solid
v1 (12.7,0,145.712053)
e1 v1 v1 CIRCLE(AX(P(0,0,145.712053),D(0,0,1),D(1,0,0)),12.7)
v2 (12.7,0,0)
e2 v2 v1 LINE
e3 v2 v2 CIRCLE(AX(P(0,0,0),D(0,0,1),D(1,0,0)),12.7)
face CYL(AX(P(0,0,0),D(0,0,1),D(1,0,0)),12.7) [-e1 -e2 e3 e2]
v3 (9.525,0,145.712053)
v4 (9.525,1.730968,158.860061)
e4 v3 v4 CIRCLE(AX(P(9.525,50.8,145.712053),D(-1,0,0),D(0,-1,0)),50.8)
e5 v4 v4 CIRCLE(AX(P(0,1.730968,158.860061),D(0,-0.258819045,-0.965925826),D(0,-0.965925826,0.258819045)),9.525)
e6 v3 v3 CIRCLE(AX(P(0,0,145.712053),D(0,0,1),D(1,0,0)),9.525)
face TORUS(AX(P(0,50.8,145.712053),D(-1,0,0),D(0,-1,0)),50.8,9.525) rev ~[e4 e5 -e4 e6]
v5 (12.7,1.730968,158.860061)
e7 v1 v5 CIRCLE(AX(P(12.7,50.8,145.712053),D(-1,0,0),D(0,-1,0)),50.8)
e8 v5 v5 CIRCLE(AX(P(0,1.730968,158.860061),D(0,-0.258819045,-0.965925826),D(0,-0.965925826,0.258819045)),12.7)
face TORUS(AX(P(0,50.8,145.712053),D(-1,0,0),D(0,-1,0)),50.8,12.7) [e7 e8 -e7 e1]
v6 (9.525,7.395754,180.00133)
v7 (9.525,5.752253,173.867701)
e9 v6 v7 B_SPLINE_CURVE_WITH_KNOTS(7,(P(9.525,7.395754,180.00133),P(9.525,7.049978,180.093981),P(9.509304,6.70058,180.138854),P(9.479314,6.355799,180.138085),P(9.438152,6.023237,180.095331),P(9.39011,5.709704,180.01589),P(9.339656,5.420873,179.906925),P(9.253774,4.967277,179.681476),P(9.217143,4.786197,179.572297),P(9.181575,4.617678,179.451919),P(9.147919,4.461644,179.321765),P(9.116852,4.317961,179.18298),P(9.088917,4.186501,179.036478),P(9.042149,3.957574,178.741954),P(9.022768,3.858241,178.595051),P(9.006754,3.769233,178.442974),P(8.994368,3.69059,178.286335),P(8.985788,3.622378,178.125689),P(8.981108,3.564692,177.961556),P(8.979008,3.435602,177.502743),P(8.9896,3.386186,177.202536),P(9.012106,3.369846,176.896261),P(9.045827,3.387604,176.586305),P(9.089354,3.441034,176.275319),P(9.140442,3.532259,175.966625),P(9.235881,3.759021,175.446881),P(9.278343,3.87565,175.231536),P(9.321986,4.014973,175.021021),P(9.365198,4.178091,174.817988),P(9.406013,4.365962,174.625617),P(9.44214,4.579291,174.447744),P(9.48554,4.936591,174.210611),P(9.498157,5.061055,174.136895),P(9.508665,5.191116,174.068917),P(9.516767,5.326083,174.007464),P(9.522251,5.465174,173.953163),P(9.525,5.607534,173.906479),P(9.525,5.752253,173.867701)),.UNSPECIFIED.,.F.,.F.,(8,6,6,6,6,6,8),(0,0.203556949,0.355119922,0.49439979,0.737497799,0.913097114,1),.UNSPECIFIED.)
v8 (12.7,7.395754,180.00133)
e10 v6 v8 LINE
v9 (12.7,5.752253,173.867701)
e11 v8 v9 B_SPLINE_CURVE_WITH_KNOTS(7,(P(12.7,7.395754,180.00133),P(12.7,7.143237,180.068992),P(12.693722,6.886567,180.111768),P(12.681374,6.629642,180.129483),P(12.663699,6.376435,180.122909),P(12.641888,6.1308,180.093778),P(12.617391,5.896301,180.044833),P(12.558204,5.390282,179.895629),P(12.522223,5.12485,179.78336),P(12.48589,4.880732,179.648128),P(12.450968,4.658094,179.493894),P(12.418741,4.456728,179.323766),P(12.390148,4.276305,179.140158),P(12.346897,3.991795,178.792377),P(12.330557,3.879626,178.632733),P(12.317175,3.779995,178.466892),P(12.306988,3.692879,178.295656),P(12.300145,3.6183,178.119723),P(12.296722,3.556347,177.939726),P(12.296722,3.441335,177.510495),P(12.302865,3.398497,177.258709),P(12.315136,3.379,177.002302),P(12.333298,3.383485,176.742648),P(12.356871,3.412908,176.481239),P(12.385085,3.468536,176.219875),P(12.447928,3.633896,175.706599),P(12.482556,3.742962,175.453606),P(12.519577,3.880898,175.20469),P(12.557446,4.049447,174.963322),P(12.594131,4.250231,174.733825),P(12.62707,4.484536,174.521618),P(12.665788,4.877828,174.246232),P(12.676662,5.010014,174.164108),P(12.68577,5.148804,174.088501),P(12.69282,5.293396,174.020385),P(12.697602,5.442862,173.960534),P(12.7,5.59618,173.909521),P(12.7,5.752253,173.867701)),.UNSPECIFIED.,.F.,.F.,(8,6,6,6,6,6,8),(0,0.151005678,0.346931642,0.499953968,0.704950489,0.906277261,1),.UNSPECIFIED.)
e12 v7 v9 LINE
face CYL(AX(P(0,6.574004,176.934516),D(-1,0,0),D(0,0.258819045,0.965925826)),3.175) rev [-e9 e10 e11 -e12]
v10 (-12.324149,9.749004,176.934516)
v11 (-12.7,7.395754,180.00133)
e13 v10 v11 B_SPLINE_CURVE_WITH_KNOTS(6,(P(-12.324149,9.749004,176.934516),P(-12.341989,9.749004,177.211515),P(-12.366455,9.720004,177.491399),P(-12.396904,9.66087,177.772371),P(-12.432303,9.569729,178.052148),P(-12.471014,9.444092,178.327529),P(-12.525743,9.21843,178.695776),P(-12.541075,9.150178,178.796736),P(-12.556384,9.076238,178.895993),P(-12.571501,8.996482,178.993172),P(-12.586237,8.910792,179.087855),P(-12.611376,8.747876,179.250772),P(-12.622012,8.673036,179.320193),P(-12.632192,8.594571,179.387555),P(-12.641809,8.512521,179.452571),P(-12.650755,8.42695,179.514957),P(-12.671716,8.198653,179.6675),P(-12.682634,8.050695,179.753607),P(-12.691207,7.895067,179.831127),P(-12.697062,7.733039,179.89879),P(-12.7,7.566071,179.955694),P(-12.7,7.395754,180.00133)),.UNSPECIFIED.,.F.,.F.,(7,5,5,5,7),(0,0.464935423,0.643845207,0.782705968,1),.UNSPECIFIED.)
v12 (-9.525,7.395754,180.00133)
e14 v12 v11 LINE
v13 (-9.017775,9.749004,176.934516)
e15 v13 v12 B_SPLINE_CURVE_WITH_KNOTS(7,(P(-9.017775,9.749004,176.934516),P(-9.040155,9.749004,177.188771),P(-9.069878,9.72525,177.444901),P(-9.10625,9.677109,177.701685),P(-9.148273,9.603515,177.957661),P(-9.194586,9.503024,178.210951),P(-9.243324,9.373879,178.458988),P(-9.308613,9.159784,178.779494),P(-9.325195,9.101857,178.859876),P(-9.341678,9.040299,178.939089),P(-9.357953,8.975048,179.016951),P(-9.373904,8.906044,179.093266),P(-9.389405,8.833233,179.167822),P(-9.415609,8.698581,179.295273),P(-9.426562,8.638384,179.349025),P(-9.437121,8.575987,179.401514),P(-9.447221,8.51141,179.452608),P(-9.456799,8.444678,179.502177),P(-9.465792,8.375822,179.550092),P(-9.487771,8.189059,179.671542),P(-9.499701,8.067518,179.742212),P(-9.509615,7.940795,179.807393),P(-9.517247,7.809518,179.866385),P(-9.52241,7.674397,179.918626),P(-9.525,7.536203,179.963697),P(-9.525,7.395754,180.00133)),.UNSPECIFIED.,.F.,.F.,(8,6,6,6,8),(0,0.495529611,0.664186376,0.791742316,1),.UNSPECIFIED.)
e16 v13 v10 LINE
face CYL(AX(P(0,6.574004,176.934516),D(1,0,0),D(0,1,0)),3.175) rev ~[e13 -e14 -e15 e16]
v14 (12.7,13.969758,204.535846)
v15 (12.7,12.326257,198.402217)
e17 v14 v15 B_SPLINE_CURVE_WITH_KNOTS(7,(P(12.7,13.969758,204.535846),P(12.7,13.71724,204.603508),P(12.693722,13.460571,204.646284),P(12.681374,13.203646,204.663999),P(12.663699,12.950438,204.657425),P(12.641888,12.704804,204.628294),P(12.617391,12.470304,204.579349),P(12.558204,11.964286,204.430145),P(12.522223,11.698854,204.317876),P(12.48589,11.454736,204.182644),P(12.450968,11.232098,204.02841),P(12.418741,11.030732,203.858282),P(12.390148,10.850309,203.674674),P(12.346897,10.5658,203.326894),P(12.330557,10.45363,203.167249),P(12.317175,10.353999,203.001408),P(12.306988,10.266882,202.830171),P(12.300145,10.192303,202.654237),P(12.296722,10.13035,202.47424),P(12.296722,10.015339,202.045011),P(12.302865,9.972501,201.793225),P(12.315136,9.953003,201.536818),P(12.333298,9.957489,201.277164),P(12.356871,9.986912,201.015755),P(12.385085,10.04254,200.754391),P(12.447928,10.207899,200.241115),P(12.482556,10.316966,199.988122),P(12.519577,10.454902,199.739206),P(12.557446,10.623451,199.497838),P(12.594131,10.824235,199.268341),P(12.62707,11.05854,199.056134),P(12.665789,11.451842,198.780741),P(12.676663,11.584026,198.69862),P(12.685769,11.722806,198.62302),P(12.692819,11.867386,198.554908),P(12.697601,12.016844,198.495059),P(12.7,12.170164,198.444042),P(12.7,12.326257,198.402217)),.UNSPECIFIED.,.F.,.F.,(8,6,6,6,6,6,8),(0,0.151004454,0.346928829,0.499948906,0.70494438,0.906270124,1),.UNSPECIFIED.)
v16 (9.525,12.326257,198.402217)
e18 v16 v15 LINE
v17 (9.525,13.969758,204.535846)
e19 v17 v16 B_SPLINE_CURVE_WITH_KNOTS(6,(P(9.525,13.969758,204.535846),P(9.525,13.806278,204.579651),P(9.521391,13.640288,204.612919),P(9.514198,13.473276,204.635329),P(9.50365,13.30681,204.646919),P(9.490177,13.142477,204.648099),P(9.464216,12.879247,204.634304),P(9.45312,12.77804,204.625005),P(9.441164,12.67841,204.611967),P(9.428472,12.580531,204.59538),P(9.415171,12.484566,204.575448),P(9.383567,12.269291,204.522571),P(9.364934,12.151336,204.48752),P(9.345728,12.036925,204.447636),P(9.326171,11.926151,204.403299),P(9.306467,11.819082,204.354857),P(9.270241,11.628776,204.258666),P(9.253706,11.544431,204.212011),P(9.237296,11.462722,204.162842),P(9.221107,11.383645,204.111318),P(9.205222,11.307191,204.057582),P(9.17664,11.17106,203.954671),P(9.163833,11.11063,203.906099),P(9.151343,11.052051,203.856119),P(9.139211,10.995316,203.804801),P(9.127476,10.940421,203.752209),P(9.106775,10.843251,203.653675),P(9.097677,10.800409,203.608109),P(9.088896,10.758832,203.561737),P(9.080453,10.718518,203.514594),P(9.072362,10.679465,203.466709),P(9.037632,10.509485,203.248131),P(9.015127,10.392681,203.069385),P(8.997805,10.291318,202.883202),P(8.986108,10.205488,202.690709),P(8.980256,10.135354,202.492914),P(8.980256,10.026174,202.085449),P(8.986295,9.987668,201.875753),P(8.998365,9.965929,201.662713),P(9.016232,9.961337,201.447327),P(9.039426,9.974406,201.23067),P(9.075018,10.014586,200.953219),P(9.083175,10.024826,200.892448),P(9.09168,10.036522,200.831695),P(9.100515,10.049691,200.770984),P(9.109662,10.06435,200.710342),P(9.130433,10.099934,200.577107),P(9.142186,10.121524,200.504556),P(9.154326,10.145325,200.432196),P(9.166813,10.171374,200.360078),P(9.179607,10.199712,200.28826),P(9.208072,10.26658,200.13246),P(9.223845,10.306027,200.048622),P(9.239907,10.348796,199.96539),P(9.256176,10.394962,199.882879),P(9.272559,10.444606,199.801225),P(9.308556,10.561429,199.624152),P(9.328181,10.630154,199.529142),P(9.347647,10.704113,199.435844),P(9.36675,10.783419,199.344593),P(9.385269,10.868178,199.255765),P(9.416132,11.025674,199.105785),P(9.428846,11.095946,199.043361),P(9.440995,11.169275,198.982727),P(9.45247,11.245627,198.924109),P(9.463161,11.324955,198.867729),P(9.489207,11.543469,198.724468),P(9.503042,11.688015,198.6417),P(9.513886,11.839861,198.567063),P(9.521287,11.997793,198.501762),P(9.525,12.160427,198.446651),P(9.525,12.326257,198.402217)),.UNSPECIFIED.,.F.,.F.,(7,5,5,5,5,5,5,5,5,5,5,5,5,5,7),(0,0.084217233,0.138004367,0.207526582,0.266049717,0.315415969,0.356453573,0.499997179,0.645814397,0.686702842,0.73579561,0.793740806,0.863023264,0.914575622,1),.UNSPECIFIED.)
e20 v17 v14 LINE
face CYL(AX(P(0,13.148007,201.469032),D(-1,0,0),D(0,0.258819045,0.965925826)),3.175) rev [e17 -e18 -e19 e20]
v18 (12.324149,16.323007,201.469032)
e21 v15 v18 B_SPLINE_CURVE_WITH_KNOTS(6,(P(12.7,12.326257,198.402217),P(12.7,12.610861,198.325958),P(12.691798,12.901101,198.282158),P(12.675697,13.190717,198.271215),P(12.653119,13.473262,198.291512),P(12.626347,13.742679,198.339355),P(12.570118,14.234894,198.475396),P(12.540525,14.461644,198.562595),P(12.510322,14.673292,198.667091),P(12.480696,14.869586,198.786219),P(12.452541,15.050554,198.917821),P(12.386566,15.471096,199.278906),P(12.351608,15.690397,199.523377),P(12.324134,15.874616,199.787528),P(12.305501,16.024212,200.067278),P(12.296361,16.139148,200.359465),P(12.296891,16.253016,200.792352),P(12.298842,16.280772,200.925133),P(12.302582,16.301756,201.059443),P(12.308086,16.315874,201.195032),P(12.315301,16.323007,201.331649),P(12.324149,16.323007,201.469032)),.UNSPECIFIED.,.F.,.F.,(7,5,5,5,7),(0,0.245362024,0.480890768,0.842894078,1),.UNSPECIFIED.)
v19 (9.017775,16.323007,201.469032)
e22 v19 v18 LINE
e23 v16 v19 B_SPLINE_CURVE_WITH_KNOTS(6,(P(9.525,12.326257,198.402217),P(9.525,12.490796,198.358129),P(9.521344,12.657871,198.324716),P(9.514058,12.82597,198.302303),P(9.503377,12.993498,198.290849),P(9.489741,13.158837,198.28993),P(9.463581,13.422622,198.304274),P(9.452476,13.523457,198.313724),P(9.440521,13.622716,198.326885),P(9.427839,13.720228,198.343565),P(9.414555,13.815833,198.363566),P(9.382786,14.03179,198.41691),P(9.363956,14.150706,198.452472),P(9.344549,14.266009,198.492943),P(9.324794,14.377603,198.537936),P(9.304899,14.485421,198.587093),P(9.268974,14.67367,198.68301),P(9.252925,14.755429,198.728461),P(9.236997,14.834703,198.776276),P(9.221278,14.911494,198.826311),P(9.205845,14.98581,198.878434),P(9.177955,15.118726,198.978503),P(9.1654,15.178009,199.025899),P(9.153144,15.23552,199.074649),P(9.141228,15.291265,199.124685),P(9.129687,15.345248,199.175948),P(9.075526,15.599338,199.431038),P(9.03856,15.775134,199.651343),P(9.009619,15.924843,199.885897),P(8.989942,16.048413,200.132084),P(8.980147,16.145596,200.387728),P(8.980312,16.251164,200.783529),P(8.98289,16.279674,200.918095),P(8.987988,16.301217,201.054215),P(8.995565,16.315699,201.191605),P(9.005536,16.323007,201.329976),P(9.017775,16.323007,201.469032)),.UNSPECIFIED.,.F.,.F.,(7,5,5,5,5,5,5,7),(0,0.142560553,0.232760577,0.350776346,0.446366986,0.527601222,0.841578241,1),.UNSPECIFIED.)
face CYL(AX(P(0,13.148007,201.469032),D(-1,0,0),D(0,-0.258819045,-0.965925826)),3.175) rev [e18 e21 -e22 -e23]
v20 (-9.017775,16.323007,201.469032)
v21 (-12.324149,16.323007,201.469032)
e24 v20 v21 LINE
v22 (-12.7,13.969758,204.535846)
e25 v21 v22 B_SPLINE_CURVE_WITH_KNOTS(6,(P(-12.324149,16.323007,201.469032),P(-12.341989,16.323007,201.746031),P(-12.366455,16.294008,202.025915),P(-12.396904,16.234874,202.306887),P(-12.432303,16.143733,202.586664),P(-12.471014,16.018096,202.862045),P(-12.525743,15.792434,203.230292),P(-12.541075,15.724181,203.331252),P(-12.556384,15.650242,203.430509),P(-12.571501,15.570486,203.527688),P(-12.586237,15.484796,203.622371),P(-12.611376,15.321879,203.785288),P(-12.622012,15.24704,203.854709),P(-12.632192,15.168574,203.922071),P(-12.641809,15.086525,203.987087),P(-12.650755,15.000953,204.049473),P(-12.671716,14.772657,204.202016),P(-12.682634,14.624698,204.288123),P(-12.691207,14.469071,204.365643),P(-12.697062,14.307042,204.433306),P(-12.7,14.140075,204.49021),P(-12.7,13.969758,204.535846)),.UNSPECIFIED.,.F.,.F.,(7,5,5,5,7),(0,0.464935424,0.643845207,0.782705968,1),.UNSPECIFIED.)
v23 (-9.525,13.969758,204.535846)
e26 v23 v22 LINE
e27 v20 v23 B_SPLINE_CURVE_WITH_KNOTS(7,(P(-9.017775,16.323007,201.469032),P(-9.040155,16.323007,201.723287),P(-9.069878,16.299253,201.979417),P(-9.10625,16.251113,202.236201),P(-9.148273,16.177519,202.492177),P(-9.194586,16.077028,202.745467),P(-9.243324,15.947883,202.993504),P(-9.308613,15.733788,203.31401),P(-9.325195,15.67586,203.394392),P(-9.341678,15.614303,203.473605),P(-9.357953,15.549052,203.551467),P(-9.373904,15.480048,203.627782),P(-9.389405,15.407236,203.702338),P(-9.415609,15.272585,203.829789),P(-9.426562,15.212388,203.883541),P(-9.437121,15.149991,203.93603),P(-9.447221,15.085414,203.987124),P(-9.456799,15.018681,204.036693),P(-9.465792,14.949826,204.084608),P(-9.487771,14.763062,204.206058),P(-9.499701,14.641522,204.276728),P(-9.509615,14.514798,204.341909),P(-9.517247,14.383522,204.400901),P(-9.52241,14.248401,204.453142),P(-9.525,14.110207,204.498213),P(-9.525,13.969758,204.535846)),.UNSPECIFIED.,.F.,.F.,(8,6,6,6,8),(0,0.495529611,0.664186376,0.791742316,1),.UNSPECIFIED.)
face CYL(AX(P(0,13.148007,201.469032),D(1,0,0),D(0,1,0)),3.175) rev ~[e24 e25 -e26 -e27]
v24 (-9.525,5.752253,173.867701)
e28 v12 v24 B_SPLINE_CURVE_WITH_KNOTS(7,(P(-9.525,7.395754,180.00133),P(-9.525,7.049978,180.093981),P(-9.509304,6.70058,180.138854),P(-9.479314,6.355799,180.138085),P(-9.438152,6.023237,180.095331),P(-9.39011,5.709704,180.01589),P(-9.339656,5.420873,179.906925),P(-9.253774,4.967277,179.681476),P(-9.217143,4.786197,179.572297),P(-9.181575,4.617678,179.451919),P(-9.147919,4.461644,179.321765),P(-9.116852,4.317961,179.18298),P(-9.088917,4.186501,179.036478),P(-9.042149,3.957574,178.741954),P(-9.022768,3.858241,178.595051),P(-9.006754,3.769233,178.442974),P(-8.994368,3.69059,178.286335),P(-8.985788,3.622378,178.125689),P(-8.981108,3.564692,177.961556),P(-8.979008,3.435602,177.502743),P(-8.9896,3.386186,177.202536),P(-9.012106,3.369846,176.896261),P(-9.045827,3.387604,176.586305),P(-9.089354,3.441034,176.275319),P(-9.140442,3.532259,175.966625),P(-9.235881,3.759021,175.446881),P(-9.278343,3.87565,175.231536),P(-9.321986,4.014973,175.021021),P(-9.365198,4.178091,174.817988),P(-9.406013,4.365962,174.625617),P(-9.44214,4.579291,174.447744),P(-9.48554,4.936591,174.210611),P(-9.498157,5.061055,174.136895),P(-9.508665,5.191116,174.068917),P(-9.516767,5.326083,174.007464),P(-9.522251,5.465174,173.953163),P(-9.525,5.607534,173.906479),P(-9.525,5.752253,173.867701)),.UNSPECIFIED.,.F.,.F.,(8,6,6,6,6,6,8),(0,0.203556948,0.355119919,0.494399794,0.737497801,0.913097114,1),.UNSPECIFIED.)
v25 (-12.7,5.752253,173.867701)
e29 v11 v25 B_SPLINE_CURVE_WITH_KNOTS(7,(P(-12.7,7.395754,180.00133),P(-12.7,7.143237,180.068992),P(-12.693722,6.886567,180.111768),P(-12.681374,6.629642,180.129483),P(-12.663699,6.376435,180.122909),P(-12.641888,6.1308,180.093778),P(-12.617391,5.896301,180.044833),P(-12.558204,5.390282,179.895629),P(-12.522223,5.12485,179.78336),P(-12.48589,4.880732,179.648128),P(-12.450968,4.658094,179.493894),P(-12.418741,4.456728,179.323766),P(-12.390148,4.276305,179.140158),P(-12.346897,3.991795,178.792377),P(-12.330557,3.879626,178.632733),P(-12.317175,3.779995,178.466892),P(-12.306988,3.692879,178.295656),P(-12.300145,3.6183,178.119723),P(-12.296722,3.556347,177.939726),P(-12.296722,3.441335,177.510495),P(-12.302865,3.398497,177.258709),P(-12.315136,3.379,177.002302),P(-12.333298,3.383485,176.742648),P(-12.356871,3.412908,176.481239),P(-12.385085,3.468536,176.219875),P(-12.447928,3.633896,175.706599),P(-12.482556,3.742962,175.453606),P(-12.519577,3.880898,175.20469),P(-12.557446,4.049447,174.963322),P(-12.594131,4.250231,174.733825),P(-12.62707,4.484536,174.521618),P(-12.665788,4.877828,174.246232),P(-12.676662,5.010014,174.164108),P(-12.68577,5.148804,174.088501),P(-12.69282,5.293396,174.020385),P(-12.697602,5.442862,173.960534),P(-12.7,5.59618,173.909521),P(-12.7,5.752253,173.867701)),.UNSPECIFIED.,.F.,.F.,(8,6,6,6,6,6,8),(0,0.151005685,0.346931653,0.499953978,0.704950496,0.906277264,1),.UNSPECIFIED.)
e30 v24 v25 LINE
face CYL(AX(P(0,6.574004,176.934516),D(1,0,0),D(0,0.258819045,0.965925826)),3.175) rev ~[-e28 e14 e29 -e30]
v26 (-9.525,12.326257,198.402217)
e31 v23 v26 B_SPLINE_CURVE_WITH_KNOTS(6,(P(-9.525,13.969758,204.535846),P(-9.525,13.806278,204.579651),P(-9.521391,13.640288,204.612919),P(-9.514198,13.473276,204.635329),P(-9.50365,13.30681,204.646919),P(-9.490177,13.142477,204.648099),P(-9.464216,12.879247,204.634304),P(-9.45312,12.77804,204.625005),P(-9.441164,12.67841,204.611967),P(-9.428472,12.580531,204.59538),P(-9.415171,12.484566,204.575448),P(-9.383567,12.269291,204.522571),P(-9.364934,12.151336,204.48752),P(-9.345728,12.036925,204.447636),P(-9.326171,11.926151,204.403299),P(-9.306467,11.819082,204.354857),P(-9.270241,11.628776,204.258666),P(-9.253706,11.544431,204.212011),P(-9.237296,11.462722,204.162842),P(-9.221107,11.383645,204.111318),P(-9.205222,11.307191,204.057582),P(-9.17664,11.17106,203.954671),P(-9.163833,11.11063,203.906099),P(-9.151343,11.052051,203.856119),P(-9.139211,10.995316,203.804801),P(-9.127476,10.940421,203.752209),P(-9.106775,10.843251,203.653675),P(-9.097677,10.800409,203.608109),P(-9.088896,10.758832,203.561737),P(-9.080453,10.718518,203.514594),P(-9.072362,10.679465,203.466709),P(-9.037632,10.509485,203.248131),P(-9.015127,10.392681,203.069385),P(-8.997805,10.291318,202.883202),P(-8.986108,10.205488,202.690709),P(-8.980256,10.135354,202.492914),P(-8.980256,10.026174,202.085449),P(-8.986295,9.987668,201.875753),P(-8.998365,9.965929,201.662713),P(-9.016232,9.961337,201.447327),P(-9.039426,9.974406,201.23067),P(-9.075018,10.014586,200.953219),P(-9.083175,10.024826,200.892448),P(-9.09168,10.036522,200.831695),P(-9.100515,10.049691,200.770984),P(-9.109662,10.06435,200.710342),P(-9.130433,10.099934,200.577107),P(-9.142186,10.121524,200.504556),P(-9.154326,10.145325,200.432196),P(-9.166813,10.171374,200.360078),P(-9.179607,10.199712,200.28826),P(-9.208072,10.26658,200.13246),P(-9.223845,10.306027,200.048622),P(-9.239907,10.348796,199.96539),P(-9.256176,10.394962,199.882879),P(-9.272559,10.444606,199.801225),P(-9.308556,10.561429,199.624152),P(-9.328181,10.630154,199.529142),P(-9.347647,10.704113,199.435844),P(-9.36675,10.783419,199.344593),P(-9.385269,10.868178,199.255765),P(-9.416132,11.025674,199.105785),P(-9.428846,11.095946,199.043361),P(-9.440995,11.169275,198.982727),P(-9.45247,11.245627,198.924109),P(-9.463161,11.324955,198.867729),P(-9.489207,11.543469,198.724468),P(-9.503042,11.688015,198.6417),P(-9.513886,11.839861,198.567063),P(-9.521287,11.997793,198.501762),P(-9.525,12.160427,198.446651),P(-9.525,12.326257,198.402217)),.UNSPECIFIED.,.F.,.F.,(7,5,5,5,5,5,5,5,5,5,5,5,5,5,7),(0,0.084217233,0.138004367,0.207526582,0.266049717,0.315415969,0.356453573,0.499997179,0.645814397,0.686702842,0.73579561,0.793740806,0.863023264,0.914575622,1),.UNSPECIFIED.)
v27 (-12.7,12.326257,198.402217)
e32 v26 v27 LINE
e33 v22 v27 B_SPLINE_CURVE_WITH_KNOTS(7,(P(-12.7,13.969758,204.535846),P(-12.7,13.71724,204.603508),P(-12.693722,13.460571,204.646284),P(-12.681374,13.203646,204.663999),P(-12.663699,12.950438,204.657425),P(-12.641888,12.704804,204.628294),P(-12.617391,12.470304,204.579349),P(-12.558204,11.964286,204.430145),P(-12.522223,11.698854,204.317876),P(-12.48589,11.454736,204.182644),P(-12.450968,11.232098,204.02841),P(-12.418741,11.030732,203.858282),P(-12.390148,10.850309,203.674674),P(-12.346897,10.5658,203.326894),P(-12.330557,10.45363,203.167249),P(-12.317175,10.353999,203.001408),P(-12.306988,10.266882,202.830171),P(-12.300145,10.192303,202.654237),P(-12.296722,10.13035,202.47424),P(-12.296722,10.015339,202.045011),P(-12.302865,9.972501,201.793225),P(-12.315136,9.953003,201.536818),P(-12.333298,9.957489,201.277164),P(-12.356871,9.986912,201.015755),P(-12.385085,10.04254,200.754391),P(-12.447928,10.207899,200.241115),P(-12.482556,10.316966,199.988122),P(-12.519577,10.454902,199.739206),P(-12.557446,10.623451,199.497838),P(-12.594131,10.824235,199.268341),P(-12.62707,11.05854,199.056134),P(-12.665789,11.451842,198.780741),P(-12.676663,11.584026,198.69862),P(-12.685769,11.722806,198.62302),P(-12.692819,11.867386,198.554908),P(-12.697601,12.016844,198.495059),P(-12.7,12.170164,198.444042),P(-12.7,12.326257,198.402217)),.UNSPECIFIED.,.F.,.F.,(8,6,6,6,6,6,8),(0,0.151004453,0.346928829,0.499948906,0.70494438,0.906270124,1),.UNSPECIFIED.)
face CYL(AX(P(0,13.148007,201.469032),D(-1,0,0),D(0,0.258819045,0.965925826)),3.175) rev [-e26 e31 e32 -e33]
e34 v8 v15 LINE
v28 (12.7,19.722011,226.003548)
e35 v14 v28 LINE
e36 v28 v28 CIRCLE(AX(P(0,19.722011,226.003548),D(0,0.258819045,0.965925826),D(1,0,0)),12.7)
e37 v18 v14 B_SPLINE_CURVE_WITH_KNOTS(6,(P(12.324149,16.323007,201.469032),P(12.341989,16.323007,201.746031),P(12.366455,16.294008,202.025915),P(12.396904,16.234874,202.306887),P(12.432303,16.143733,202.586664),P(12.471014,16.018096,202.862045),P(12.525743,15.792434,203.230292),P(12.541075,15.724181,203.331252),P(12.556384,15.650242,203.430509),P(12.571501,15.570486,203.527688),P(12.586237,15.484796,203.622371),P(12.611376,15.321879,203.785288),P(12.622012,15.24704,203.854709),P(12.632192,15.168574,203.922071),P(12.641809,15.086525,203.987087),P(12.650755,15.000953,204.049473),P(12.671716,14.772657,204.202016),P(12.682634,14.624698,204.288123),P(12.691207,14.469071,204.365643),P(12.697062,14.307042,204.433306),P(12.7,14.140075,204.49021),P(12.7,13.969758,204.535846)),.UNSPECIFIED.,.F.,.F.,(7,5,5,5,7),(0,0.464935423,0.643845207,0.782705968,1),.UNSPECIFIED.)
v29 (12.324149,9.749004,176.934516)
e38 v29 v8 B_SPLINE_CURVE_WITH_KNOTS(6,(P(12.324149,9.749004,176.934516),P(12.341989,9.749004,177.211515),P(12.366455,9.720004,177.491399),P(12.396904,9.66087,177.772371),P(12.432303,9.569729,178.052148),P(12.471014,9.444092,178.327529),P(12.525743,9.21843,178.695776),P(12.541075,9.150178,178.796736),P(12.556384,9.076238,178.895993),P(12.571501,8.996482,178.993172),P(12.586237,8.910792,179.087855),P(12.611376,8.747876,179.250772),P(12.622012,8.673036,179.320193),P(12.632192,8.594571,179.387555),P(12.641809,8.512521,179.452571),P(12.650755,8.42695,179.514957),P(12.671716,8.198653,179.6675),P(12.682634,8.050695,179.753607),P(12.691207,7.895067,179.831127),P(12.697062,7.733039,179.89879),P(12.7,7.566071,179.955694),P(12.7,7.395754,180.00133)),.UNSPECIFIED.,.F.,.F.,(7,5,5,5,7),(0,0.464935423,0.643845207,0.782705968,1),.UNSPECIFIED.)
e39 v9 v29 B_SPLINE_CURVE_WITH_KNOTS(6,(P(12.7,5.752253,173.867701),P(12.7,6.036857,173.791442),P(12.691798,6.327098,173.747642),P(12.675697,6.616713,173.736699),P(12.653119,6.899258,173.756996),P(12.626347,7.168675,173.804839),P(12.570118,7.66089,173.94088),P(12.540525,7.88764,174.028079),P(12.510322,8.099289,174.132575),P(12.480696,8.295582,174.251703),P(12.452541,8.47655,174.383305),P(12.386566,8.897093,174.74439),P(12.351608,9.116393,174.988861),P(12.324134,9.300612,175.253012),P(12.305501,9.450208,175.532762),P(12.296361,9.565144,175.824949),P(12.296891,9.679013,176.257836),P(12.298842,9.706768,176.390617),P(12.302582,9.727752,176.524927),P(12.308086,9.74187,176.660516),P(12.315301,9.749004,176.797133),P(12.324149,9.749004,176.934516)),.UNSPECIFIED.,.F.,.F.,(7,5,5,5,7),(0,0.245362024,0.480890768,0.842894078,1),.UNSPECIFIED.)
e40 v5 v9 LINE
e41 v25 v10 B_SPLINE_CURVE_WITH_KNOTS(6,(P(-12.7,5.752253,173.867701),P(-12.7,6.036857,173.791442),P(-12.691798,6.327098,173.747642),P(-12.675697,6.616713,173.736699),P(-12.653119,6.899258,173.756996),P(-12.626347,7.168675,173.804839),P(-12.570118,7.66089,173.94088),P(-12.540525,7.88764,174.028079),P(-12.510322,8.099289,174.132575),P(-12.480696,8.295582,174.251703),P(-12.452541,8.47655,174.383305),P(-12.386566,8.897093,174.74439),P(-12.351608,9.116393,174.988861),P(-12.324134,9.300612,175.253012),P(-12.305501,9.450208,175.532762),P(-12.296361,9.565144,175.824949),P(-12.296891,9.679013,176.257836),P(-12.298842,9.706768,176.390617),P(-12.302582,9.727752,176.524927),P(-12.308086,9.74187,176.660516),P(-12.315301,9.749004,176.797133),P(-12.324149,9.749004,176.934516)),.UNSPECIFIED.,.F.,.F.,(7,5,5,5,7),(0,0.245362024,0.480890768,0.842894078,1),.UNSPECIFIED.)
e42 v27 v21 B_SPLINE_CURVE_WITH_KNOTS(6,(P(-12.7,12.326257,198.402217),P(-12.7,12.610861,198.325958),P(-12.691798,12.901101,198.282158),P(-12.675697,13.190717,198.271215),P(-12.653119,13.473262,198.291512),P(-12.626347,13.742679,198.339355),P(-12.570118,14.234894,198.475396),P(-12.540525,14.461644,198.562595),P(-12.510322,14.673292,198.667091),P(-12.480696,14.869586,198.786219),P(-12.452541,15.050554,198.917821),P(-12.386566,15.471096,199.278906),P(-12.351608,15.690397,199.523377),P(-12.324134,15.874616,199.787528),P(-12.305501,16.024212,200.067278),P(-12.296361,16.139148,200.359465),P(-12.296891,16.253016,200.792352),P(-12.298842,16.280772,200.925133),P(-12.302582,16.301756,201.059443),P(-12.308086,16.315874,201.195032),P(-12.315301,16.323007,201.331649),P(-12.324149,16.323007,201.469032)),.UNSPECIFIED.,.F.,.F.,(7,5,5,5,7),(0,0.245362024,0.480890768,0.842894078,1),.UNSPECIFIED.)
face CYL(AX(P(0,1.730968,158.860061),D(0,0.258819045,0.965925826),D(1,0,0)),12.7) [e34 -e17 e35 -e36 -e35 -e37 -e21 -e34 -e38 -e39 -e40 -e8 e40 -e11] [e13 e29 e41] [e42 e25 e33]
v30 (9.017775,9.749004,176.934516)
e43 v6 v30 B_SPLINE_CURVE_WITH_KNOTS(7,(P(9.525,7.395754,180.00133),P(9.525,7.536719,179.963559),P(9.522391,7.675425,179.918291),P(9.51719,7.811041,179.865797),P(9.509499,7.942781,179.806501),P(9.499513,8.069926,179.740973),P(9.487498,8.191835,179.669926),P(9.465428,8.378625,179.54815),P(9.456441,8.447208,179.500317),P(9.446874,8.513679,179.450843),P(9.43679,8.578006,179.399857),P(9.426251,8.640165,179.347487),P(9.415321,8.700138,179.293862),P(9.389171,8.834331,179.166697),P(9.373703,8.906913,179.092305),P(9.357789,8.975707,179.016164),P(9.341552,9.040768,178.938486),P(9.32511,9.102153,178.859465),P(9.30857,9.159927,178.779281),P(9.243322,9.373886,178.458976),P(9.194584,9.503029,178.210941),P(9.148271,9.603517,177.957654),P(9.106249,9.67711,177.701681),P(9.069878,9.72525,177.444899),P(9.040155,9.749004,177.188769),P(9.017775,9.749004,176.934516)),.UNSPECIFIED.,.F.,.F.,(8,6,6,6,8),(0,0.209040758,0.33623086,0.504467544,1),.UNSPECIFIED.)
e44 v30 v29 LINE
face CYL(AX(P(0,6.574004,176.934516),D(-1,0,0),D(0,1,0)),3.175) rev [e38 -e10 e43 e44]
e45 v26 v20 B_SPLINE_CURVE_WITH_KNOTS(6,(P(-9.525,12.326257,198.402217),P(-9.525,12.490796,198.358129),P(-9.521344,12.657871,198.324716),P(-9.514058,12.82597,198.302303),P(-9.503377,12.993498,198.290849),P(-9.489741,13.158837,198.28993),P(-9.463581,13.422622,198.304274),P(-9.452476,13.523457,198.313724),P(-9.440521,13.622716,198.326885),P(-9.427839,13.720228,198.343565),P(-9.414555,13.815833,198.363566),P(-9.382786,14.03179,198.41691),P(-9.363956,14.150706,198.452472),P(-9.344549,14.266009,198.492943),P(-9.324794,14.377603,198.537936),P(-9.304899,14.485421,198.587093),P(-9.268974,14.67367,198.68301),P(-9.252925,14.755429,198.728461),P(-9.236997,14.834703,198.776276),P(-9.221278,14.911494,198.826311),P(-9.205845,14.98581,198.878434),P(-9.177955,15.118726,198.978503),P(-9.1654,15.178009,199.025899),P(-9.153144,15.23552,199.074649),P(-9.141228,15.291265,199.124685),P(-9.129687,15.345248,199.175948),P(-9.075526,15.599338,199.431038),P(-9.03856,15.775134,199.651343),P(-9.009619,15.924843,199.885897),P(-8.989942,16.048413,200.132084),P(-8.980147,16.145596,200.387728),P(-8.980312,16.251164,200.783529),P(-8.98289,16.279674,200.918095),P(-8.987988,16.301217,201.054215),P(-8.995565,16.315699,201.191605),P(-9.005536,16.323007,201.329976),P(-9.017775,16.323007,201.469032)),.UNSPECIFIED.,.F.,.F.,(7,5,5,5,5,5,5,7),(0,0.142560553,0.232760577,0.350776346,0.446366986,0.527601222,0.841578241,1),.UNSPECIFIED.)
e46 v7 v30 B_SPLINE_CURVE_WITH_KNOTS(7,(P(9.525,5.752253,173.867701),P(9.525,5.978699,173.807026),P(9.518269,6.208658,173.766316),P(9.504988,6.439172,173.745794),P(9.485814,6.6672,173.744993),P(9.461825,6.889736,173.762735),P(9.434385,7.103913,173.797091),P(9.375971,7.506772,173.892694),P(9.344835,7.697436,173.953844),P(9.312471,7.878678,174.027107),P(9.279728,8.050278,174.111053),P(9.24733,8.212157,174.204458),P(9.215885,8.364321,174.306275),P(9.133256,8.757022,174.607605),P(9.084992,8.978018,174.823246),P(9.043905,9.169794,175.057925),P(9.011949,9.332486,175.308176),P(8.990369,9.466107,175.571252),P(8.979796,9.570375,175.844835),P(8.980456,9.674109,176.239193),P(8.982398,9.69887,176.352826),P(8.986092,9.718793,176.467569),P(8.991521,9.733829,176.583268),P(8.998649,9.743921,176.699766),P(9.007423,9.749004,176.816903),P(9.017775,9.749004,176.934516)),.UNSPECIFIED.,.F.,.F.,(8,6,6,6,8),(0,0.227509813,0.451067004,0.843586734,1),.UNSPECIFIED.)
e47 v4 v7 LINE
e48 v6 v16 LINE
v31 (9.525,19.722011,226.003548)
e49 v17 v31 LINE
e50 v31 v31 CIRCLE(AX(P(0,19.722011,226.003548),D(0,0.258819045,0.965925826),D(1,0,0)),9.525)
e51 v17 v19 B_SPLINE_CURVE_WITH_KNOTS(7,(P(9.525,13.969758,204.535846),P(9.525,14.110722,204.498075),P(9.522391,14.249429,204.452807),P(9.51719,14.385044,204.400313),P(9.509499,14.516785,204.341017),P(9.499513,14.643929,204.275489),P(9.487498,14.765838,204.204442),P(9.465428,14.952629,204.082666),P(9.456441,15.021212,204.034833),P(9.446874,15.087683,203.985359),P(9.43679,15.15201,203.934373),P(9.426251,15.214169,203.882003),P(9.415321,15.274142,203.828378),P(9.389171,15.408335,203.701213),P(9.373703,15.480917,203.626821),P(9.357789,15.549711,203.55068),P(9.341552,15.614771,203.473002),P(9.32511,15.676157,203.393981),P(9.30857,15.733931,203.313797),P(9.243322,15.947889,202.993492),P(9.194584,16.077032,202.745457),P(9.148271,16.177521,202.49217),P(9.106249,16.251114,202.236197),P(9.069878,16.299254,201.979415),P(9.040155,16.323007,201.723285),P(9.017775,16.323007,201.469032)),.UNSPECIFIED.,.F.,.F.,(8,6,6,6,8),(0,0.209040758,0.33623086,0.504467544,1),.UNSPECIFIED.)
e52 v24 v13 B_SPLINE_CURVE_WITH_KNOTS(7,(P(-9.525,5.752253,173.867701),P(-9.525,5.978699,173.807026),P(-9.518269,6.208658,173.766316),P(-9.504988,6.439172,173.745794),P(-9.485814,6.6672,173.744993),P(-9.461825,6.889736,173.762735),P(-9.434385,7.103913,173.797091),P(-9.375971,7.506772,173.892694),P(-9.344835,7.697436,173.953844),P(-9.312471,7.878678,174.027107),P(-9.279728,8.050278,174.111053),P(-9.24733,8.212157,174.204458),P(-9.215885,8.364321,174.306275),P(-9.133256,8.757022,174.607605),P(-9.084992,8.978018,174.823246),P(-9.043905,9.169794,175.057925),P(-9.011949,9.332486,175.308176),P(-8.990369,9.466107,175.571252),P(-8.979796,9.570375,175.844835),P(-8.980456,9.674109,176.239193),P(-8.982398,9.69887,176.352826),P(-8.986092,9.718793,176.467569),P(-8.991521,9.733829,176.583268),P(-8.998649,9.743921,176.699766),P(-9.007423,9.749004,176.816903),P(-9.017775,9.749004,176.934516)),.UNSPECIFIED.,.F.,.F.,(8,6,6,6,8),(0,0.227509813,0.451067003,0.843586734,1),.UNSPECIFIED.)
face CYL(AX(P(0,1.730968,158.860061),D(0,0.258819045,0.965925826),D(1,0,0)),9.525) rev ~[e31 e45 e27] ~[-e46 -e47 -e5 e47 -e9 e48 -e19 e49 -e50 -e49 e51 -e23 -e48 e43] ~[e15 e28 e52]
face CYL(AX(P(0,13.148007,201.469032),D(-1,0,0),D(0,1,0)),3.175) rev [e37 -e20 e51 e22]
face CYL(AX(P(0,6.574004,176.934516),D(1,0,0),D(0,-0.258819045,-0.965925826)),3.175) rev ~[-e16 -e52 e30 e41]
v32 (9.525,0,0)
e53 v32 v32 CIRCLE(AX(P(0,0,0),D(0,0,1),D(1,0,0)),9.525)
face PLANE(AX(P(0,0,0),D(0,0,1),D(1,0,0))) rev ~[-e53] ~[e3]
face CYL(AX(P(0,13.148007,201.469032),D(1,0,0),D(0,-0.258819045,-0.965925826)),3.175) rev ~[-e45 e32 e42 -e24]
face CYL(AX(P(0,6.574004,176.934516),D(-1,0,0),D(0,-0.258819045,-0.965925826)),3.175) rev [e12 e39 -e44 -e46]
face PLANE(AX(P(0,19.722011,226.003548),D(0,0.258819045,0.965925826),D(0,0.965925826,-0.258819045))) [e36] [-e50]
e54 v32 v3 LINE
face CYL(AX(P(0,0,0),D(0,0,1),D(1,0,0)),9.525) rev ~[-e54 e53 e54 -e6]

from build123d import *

# Parameters (mm, degrees)
F0_R     = 12.7
F0_R_2   = 9.525
F3_DEPTH = 25.4


with BuildPart() as f2:
    # F2: sweep along a path in F1
    with BuildLine(Plane.YZ) as f2_path:
        Line((0, 0), (0, 145.7120531226))
        ThreePointArc((0, 145.7120531226), (0.4346010422, 152.3427836873), (1.7309680245, 158.8600606138))
        Line((1.7309680245, 158.8600606138), (19.7220112368, 226.0035479632))
    # F0 (on Top) → F2 (sweep)
    with BuildSketch(Plane.XY):
        Circle(F0_R)
        Circle(F0_R_2, mode=Mode.SUBTRACT)
    sweep(path=f2_path.line)

    # F1 (on Right) → F3 (cut, symmetric)
    with BuildSketch(Plane.YZ):
        with BuildLine():
            ThreePointArc((13.9697579594, 204.535846474), (10.0811929927, 202.2907824437), (12.326257023, 198.402217477))
            Line((12.326257023, 198.402217477), (13.9697579594, 204.535846474))
        make_face()
        with BuildLine():
            Line((13.9697579594, 204.535846474), (12.326257023, 198.402217477))
            ThreePointArc((12.326257023, 198.402217477), (15.0808250283, 198.9501351201), (16.3230074912, 201.4690319755))
            ThreePointArc((16.3230074912, 201.4690319755), (15.6669043466, 203.4018495126), (13.9697579594, 204.535846474))
        make_face()
        with BuildLine():
            Line((7.3957542138, 180.0013304862), (5.7522532774, 173.8677014893))
            ThreePointArc((5.7522532774, 173.8677014893), (8.5068212827, 174.4156191323), (9.7490037456, 176.9345159877))
            ThreePointArc((9.7490037456, 176.9345159877), (9.092900601, 178.8673335248), (7.3957542138, 180.0013304862))
        make_face()
        with BuildLine():
            ThreePointArc((7.3957542138, 180.0013304862), (3.5071892471, 177.7562664559), (5.7522532774, 173.8677014893))
            Line((5.7522532774, 173.8677014893), (7.3957542138, 180.0013304862))
        make_face()
    extrude(amount=F3_DEPTH, both=True, mode=Mode.SUBTRACT)


solid = f2.part
